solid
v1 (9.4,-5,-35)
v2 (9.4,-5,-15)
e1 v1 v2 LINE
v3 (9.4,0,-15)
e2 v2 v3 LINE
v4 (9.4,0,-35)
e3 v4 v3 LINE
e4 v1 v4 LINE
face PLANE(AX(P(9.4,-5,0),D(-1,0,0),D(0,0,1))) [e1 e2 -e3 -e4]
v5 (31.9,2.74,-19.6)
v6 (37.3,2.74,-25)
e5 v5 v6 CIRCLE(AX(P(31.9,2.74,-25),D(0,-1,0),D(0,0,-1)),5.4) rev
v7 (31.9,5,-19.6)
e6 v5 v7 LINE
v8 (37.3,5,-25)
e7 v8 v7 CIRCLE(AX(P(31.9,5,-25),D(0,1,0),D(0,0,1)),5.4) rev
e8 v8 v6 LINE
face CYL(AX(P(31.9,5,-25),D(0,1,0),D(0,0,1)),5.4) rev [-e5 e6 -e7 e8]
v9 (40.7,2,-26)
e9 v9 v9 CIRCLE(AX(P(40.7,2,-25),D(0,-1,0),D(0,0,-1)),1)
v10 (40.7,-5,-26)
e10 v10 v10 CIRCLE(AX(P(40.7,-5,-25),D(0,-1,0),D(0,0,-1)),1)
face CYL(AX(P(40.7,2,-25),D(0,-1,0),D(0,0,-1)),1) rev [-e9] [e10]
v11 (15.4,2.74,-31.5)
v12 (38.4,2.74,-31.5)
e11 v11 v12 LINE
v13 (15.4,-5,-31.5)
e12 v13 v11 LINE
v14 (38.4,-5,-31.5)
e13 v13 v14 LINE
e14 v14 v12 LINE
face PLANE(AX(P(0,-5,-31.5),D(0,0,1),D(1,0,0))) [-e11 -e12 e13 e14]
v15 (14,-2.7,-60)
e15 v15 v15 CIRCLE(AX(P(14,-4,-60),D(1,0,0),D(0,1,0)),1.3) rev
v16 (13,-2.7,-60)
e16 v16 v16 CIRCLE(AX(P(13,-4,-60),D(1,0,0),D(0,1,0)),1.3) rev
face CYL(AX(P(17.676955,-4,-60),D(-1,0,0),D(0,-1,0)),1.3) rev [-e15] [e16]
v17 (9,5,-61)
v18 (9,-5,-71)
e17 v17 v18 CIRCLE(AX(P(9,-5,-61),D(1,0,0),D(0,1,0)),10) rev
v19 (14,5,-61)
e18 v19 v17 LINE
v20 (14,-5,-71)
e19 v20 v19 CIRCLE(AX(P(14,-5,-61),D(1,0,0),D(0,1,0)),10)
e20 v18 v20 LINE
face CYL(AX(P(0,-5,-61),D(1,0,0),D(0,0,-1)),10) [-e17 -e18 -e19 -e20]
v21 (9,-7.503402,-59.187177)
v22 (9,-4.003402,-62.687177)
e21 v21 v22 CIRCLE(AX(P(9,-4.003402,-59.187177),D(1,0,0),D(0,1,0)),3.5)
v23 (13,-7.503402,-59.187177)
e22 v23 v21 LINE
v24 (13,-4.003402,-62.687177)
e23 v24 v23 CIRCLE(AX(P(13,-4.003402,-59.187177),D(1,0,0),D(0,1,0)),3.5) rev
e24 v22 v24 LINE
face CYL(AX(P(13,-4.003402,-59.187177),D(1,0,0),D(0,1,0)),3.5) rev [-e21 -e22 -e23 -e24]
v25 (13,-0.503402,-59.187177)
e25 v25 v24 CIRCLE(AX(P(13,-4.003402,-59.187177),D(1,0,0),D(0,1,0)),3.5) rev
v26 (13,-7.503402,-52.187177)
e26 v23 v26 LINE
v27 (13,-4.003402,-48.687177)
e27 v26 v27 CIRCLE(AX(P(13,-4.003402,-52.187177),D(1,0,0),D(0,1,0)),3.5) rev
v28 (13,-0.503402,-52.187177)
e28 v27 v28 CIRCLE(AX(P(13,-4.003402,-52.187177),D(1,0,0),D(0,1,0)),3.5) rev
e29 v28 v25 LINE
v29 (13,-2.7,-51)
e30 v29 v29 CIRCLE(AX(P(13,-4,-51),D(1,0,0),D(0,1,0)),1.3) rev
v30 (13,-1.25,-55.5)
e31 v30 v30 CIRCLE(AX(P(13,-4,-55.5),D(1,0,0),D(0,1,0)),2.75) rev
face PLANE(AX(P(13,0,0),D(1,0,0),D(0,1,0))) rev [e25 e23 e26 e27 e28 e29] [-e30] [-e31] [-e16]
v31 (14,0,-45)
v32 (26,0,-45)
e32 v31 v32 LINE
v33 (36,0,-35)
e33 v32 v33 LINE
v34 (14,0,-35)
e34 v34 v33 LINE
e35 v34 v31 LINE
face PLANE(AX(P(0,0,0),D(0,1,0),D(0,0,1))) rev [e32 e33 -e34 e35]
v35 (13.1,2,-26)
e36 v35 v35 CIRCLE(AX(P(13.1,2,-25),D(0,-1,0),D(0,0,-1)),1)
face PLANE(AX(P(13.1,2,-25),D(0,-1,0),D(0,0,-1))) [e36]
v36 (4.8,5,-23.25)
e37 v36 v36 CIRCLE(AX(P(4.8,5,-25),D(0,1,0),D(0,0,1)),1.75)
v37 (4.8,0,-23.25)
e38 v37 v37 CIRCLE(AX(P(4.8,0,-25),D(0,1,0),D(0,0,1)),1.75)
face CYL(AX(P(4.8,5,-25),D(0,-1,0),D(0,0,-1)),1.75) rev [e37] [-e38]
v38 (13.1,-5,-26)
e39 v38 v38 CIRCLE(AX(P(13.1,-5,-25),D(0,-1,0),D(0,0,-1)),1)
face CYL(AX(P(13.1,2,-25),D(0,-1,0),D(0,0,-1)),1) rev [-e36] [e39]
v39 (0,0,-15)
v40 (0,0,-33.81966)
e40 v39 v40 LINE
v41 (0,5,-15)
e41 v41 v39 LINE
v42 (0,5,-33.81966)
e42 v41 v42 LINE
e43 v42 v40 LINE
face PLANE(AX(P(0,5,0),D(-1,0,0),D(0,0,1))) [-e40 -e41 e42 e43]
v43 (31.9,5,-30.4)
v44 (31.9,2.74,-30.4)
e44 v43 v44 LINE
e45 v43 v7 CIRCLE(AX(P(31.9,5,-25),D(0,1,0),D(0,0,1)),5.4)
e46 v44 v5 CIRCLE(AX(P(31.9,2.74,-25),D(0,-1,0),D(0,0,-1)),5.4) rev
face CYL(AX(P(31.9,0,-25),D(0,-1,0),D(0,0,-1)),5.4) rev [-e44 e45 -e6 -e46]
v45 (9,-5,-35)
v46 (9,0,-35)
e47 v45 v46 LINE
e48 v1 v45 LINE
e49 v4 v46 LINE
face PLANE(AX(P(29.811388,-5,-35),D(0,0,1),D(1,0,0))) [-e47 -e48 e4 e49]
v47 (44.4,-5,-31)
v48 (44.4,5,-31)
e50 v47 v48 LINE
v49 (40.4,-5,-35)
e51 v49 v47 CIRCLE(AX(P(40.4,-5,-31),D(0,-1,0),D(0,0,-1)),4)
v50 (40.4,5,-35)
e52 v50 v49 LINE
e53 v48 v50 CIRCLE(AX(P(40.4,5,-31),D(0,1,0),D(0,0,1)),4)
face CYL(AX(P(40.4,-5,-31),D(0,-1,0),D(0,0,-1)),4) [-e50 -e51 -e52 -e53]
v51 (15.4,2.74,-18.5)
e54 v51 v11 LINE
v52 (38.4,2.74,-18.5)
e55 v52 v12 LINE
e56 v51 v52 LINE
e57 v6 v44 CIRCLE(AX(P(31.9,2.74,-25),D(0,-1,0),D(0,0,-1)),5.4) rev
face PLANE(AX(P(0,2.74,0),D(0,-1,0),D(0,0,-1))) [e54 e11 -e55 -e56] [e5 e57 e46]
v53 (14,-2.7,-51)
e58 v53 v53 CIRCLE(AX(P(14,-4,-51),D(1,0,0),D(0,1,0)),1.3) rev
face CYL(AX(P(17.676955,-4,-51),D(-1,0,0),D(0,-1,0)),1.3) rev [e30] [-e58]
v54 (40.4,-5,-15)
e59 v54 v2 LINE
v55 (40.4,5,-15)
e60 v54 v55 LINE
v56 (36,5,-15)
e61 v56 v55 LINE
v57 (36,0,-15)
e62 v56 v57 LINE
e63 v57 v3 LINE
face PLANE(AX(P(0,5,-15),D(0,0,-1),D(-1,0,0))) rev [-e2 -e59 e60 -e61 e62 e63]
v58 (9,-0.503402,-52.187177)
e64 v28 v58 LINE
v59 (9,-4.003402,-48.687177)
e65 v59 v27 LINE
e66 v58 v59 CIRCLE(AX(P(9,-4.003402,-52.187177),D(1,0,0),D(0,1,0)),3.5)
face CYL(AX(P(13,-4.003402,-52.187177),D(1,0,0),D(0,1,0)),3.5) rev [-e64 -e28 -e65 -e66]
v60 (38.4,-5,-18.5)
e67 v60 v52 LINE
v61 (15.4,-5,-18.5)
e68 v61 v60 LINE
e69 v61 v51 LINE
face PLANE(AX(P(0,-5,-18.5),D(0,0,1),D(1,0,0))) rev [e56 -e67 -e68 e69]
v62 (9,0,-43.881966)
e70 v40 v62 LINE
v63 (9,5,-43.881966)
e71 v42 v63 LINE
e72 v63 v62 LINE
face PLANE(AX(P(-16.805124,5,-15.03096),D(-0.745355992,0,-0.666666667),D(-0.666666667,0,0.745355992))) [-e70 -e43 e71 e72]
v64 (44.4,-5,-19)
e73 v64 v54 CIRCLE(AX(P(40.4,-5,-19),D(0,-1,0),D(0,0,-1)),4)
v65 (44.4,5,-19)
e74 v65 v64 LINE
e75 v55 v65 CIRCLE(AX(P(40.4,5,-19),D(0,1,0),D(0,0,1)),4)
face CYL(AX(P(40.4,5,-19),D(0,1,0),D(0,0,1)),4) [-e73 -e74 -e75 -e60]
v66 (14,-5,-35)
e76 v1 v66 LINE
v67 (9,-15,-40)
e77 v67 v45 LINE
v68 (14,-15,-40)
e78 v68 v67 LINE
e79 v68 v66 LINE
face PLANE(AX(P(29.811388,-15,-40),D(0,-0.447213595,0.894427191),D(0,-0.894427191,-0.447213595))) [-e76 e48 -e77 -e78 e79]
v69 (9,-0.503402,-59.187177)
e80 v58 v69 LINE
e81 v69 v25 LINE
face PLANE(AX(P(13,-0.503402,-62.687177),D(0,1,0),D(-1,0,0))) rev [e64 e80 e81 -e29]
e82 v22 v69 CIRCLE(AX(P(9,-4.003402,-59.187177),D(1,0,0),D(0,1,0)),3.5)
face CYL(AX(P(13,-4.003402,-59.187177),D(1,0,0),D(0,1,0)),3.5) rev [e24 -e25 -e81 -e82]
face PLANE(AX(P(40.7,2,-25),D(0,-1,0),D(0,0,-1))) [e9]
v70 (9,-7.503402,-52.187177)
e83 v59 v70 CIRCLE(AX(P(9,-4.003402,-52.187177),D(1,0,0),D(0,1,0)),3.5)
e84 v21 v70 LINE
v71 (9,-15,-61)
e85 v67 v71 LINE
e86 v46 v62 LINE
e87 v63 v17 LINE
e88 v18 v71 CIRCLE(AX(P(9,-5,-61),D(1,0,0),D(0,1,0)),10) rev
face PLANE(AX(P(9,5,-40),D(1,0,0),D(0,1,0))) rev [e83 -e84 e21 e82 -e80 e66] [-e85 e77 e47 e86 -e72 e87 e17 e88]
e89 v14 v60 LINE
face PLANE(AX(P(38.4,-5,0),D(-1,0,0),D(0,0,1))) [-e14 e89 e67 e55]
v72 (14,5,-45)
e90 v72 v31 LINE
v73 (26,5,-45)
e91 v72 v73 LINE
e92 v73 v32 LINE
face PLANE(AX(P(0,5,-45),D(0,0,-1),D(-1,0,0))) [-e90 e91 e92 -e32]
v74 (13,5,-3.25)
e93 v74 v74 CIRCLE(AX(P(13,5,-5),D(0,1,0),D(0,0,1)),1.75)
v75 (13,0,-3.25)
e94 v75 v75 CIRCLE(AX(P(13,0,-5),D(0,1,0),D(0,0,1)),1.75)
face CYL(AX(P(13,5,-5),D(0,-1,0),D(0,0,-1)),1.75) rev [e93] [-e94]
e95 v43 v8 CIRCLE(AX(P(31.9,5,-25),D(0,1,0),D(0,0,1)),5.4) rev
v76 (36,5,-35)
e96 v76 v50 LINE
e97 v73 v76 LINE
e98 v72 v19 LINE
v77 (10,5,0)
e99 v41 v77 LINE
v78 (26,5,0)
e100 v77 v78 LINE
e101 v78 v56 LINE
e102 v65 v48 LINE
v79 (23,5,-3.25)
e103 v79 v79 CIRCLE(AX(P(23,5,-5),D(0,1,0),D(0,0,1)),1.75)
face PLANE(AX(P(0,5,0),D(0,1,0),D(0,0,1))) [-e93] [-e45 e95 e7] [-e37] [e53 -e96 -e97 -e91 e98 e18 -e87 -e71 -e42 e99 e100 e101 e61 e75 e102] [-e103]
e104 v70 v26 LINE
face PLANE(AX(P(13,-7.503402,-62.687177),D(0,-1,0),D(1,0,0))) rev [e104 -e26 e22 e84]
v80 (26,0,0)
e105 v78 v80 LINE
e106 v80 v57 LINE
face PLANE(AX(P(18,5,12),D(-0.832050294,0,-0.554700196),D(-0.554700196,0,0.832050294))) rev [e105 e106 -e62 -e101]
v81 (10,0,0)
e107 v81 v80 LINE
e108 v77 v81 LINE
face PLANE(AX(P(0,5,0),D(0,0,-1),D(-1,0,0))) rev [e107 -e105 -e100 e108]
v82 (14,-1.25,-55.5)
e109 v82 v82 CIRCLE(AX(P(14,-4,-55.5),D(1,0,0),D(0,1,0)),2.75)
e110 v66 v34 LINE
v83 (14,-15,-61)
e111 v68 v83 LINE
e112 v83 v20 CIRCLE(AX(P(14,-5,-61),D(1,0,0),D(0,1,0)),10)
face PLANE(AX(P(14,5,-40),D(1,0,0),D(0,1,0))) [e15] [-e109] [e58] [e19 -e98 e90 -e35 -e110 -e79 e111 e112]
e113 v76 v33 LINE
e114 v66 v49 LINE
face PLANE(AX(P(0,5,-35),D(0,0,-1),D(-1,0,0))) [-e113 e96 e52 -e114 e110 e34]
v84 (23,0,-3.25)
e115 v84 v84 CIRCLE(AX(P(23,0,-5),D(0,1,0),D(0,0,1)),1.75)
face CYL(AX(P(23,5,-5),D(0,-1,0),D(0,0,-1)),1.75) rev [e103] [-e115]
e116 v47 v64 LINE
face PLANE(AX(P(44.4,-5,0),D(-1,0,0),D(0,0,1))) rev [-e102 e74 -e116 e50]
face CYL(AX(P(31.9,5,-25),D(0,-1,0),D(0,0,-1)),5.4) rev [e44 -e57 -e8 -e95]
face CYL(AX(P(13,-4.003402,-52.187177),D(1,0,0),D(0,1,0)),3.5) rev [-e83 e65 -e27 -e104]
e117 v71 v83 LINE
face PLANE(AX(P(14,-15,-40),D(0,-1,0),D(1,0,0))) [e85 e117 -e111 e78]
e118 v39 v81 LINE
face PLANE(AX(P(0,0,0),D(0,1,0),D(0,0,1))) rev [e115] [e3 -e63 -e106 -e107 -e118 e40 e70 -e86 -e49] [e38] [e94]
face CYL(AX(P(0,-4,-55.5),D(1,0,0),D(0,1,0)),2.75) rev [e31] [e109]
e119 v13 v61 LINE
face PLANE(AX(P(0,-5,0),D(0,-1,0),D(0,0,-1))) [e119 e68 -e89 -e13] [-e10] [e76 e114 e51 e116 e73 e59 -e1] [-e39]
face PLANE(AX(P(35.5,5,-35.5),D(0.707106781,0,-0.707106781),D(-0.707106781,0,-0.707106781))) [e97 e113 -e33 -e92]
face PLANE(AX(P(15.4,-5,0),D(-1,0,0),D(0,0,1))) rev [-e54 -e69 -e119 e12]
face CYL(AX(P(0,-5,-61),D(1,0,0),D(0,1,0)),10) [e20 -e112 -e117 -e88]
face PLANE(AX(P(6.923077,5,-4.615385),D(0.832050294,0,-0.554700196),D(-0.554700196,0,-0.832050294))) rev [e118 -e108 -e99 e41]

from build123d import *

# Parameters (mm, degrees)
SKETCH1_R                = 1.75
SKETCH1_W                = 7.2
SKETCH1_H                = 5.4
BOSS_EXTRUDE1_DEPTH      = 5
FILLET5_RADIUS           = 10
FILLET5_LENGTH           = 5
FILLET2_R                = 5.4
FILLET6_R                = 5.4
SKETCH3_W                = 35
SKETCH3_H                = 20
SKETCH3_W_2              = 23
SKETCH3_H_2              = 13
BOSS_EXTRUDE4_DEPTH      = 5
SKETCH5_W                = 23
SKETCH5_H                = 13
CUT_EXTRUDE1_DEPTH       = 2.74
CUT_EXTRUDE2_DEPTH       = 76.166481892
FILLET9_R                = 4
BOSS_EXTRUDE7_DEPTH      = 26
BOSS_EXTRUDE7_DEPTH_BACK = 5
SKETCH7_W                = 5
SKETCH7_H                = 20
SKETCH8_R                = 2.75
CUT_EXTRUDE3_DEPTH       = 79.677569866
FILLET10_R               = 10
SKETCH9_R                = 1
CUT_EXTRUDE4_DEPTH       = 7
BOSS_EXTRUDE8_DEPTH      = 5
SKETCH11_R               = 1.3
CUT_EXTRUDE5_DEPTH       = 5
SKETCH12_W               = 14
SKETCH12_H               = 7
CUT_EXTRUDE6_DEPTH       = 4
FILLET11_R               = 3.5


with BuildPart() as part:
    # Sketch1 → Boss-Extrude1 (new body)
    # profile 1 of 4: a face of its own
    with BuildSketch(Plane(origin=(0, 0, 0), x_dir=(1, 0, 0), z_dir=(0, 1, 0))):
        with BuildLine():
            Line((3.05, 25), (0, 25))
            Line((0, 25), (0, 15))
            Line((0, 15), (10, 0))
            Line((10, 0), (26, 0))
            Line((26, 0), (36, 15))
            Line((36, 15), (60, 15))
            Line((60, 15), (60, 25))
            Line((60, 25), (44.5, 25))
            Line((44.5, 25), (44.5, 19.6))
            Line((44.5, 19.6), (37.3, 19.6))
            Line((37.3, 19.6), (26.5, 19.6))
            Line((26.5, 19.6), (26.5, 25))
            Line((26.5, 25), (6.55, 25))
            ThreePointArc((6.55, 25), (4.8, 23.25), (3.05, 25))
        make_face()
        with Locations(Location((13, 5, 0), (0, 0, 270))):
            Circle(SKETCH1_R, mode=Mode.SUBTRACT)
        with Locations(Location((23, 5, 0), (0, 0, 270))):
            Circle(SKETCH1_R, mode=Mode.SUBTRACT)
    # profile 2 of 4: a face of its own
    with BuildSketch(Plane(origin=(0, 0, 0), x_dir=(1, 0, 0), z_dir=(0, 1, 0))):
        with BuildLine():
            Line((10, 45), (0, 33.819660113))
            Line((0, 33.819660113), (0, 25))
            Line((0, 25), (3.05, 25))
            ThreePointArc((3.05, 25), (4.8, 26.75), (6.55, 25))
            Line((6.55, 25), (26.5, 25))
            Line((26.5, 25), (26.5, 30.4))
            Line((26.5, 30.4), (37.3, 30.4))
            Line((37.3, 30.4), (44.5, 30.4))
            Line((44.5, 30.4), (44.5, 25))
            Line((44.5, 25), (60, 25))
            Line((60, 25), (60, 35))
            Line((60, 35), (36, 35))
            Line((36, 35), (26, 45))
            Line((26, 45), (10, 45))
        make_face()
    # profile 3 of 4: a face of its own
    with BuildSketch(Plane(origin=(0, 0, 0), x_dir=(1, 0, 0), z_dir=(0, 1, 0))):
        with Locations((40.9, 27.7)):
            Rectangle(SKETCH1_W, SKETCH1_H)
    # profile 4 of 4: a face of its own
    with BuildSketch(Plane(origin=(0, 0, 0), x_dir=(1, 0, 0), z_dir=(0, 1, 0))):
        with Locations((40.9, 22.3)):
            Rectangle(SKETCH1_W, SKETCH1_H)
    extrude(amount=BOSS_EXTRUDE1_DEPTH)

    # Fillet5: full round fillet: the end face becomes a half cylinder, R = half its width
    fillet5_face = Plane((60, 2.5, -25), x_dir=(0, -1, 0), z_dir=(1, 0, 0))  # on the end face: x along it, z out of the body
    fillet5_slab = fillet5_face.offset(-FILLET5_RADIUS / 2) * Box(FILLET5_LENGTH, 2 * FILLET5_RADIUS, FILLET5_RADIUS, mode=Mode.PRIVATE)  # the body's end, R deep
    fillet5_round = Plane((50, 2.5, -25), x_dir=(1, 0, 0), z_dir=(0, -1, 0)) * Cylinder(FILLET5_RADIUS, FILLET5_LENGTH, mode=Mode.PRIVATE)  # its axis R under the face
    add(fillet5_slab - fillet5_round, mode=Mode.SUBTRACT)

    # Fillet2
    fillet2_edges = [part.edges().sort_by_distance(p)[0] for p in [
        (26.5, 2.5, -30.4),
        (26.5, 2.5, -19.6),
    ]]
    fillet(fillet2_edges, radius=FILLET2_R - 0.0001)  # a hair under: the kernel refuses the full size

    # Fillet6
    fillet6_edges = [part.edges().sort_by_distance(p)[0] for p in [
        (37.3, 2.5, -19.6),
        (37.3, 2.5, -30.4),
    ]]
    fillet(fillet6_edges, radius=FILLET6_R - 0.0001)  # a hair under: the kernel refuses the full size

    # Sketch3 → Boss-Extrude4 (add)
    with BuildSketch(Plane.XZ):
        with Locations((26.9, -25)):
            Rectangle(SKETCH3_W, SKETCH3_H)
        with Locations((26.9, -25)):
            Rectangle(SKETCH3_W_2, SKETCH3_H_2, mode=Mode.SUBTRACT)
    extrude(amount=BOSS_EXTRUDE4_DEPTH)

    # Sketch5 → Cut-Extrude1 (cut)
    with BuildSketch(Plane.XZ):
        with Locations((26.9, -25)):
            Rectangle(SKETCH5_W, SKETCH5_H)
    extrude(amount=-CUT_EXTRUDE1_DEPTH, mode=Mode.SUBTRACT)

    # Sketch6 → Cut-Extrude2 (cut, through all)
    with BuildSketch(Plane.XZ):
        with BuildLine():
            Line((44.4, -35), (50, -35))
            ThreePointArc((50, -35), (60, -25), (50, -15))
            Line((50, -15), (44.4, -15))
            Line((44.4, -15), (44.4, -35))
        make_face()
    extrude(amount=-CUT_EXTRUDE2_DEPTH, mode=Mode.SUBTRACT)

    # Fillet9
    fillet9_edges = [part.edges().sort_by_distance(p)[0] for p in [
        (44.4, 0, -35),
        (44.4, 0, -15),
    ]]
    fillet(fillet9_edges, radius=FILLET9_R)

    # Sketch7 → Boss-Extrude7 (add, two sides: drawn at the far end of the back side and taken through both)
    with BuildSketch(Plane(origin=(0, 0, -45), x_dir=(-1, 0, 0), z_dir=(0, 0, -1)).offset(-BOSS_EXTRUDE7_DEPTH_BACK)):
        with Locations((-11.5, -5)):
            Rectangle(SKETCH7_W, SKETCH7_H)
    extrude(amount=BOSS_EXTRUDE7_DEPTH + BOSS_EXTRUDE7_DEPTH_BACK)

    # Sketch8 → Cut-Extrude3 (cut, through all)
    with BuildSketch(Plane(origin=(14, 0, 0), x_dir=(0, 0, -1), z_dir=(1, 0, 0))):
        with Locations(Location((55.5, -4, 0), (0, 0, 90))):
            Circle(SKETCH8_R)
    extrude(amount=-CUT_EXTRUDE3_DEPTH, mode=Mode.SUBTRACT)

    # Fillet10
    fillet10_edges = [part.edges().sort_by_distance(p)[0] for p in [
        (11.5, -15, -71),
        (11.5, 5, -71),
    ]]
    fillet(fillet10_edges, radius=FILLET10_R - 0.0001)  # a hair under: the kernel refuses the full size

    # Sketch9 → Cut-Extrude4 (cut)
    with BuildSketch(Plane.XZ.offset(5)):
        with Locations(Location((13.1, -25, 0), (0, 0, 270))):
            Circle(SKETCH9_R)
        with Locations(Location((40.7, -25, 0), (0, 0, 270))):
            Circle(SKETCH9_R)
    extrude(amount=-CUT_EXTRUDE4_DEPTH, mode=Mode.SUBTRACT)

    # Sketch10 → Boss-Extrude8 (add)
    with BuildSketch(Plane.ZY.offset(-9)):
        Polygon((-40, 0), (-40, -15), (-35, -5), (-35, 0), align=None)
    extrude(amount=-BOSS_EXTRUDE8_DEPTH)

    # Sketch11 → Cut-Extrude5 (cut)
    with BuildSketch(Plane.ZY.offset(-9)):
        with Locations(Location((-51, -4, 0), (0, 0, 270))):
            Circle(SKETCH11_R)
        with Locations(Location((-60, -4, 0), (0, 0, 270))):
            Circle(SKETCH11_R)
    extrude(amount=-CUT_EXTRUDE5_DEPTH, mode=Mode.SUBTRACT)

    # Sketch12 → Cut-Extrude6 (cut)
    with BuildSketch(Plane.ZY.offset(-9)):
        with Locations((-55.6871773, -4.003401726)):
            Rectangle(SKETCH12_W, SKETCH12_H)
    extrude(amount=-CUT_EXTRUDE6_DEPTH, mode=Mode.SUBTRACT)

    # Fillet11
    fillet11_edges = [part.edges().sort_by_distance(p)[0] for p in [
        (11, -7.503401726, -48.6871773),
        (11, -0.503401726, -48.6871773),
        (11, -0.503401726, -62.6871773),
        (11, -7.503401726, -62.6871773),
    ]]
    fillet(fillet11_edges, radius=FILLET11_R - 0.0001)  # a hair under: the kernel refuses the full size


solid = part.part
